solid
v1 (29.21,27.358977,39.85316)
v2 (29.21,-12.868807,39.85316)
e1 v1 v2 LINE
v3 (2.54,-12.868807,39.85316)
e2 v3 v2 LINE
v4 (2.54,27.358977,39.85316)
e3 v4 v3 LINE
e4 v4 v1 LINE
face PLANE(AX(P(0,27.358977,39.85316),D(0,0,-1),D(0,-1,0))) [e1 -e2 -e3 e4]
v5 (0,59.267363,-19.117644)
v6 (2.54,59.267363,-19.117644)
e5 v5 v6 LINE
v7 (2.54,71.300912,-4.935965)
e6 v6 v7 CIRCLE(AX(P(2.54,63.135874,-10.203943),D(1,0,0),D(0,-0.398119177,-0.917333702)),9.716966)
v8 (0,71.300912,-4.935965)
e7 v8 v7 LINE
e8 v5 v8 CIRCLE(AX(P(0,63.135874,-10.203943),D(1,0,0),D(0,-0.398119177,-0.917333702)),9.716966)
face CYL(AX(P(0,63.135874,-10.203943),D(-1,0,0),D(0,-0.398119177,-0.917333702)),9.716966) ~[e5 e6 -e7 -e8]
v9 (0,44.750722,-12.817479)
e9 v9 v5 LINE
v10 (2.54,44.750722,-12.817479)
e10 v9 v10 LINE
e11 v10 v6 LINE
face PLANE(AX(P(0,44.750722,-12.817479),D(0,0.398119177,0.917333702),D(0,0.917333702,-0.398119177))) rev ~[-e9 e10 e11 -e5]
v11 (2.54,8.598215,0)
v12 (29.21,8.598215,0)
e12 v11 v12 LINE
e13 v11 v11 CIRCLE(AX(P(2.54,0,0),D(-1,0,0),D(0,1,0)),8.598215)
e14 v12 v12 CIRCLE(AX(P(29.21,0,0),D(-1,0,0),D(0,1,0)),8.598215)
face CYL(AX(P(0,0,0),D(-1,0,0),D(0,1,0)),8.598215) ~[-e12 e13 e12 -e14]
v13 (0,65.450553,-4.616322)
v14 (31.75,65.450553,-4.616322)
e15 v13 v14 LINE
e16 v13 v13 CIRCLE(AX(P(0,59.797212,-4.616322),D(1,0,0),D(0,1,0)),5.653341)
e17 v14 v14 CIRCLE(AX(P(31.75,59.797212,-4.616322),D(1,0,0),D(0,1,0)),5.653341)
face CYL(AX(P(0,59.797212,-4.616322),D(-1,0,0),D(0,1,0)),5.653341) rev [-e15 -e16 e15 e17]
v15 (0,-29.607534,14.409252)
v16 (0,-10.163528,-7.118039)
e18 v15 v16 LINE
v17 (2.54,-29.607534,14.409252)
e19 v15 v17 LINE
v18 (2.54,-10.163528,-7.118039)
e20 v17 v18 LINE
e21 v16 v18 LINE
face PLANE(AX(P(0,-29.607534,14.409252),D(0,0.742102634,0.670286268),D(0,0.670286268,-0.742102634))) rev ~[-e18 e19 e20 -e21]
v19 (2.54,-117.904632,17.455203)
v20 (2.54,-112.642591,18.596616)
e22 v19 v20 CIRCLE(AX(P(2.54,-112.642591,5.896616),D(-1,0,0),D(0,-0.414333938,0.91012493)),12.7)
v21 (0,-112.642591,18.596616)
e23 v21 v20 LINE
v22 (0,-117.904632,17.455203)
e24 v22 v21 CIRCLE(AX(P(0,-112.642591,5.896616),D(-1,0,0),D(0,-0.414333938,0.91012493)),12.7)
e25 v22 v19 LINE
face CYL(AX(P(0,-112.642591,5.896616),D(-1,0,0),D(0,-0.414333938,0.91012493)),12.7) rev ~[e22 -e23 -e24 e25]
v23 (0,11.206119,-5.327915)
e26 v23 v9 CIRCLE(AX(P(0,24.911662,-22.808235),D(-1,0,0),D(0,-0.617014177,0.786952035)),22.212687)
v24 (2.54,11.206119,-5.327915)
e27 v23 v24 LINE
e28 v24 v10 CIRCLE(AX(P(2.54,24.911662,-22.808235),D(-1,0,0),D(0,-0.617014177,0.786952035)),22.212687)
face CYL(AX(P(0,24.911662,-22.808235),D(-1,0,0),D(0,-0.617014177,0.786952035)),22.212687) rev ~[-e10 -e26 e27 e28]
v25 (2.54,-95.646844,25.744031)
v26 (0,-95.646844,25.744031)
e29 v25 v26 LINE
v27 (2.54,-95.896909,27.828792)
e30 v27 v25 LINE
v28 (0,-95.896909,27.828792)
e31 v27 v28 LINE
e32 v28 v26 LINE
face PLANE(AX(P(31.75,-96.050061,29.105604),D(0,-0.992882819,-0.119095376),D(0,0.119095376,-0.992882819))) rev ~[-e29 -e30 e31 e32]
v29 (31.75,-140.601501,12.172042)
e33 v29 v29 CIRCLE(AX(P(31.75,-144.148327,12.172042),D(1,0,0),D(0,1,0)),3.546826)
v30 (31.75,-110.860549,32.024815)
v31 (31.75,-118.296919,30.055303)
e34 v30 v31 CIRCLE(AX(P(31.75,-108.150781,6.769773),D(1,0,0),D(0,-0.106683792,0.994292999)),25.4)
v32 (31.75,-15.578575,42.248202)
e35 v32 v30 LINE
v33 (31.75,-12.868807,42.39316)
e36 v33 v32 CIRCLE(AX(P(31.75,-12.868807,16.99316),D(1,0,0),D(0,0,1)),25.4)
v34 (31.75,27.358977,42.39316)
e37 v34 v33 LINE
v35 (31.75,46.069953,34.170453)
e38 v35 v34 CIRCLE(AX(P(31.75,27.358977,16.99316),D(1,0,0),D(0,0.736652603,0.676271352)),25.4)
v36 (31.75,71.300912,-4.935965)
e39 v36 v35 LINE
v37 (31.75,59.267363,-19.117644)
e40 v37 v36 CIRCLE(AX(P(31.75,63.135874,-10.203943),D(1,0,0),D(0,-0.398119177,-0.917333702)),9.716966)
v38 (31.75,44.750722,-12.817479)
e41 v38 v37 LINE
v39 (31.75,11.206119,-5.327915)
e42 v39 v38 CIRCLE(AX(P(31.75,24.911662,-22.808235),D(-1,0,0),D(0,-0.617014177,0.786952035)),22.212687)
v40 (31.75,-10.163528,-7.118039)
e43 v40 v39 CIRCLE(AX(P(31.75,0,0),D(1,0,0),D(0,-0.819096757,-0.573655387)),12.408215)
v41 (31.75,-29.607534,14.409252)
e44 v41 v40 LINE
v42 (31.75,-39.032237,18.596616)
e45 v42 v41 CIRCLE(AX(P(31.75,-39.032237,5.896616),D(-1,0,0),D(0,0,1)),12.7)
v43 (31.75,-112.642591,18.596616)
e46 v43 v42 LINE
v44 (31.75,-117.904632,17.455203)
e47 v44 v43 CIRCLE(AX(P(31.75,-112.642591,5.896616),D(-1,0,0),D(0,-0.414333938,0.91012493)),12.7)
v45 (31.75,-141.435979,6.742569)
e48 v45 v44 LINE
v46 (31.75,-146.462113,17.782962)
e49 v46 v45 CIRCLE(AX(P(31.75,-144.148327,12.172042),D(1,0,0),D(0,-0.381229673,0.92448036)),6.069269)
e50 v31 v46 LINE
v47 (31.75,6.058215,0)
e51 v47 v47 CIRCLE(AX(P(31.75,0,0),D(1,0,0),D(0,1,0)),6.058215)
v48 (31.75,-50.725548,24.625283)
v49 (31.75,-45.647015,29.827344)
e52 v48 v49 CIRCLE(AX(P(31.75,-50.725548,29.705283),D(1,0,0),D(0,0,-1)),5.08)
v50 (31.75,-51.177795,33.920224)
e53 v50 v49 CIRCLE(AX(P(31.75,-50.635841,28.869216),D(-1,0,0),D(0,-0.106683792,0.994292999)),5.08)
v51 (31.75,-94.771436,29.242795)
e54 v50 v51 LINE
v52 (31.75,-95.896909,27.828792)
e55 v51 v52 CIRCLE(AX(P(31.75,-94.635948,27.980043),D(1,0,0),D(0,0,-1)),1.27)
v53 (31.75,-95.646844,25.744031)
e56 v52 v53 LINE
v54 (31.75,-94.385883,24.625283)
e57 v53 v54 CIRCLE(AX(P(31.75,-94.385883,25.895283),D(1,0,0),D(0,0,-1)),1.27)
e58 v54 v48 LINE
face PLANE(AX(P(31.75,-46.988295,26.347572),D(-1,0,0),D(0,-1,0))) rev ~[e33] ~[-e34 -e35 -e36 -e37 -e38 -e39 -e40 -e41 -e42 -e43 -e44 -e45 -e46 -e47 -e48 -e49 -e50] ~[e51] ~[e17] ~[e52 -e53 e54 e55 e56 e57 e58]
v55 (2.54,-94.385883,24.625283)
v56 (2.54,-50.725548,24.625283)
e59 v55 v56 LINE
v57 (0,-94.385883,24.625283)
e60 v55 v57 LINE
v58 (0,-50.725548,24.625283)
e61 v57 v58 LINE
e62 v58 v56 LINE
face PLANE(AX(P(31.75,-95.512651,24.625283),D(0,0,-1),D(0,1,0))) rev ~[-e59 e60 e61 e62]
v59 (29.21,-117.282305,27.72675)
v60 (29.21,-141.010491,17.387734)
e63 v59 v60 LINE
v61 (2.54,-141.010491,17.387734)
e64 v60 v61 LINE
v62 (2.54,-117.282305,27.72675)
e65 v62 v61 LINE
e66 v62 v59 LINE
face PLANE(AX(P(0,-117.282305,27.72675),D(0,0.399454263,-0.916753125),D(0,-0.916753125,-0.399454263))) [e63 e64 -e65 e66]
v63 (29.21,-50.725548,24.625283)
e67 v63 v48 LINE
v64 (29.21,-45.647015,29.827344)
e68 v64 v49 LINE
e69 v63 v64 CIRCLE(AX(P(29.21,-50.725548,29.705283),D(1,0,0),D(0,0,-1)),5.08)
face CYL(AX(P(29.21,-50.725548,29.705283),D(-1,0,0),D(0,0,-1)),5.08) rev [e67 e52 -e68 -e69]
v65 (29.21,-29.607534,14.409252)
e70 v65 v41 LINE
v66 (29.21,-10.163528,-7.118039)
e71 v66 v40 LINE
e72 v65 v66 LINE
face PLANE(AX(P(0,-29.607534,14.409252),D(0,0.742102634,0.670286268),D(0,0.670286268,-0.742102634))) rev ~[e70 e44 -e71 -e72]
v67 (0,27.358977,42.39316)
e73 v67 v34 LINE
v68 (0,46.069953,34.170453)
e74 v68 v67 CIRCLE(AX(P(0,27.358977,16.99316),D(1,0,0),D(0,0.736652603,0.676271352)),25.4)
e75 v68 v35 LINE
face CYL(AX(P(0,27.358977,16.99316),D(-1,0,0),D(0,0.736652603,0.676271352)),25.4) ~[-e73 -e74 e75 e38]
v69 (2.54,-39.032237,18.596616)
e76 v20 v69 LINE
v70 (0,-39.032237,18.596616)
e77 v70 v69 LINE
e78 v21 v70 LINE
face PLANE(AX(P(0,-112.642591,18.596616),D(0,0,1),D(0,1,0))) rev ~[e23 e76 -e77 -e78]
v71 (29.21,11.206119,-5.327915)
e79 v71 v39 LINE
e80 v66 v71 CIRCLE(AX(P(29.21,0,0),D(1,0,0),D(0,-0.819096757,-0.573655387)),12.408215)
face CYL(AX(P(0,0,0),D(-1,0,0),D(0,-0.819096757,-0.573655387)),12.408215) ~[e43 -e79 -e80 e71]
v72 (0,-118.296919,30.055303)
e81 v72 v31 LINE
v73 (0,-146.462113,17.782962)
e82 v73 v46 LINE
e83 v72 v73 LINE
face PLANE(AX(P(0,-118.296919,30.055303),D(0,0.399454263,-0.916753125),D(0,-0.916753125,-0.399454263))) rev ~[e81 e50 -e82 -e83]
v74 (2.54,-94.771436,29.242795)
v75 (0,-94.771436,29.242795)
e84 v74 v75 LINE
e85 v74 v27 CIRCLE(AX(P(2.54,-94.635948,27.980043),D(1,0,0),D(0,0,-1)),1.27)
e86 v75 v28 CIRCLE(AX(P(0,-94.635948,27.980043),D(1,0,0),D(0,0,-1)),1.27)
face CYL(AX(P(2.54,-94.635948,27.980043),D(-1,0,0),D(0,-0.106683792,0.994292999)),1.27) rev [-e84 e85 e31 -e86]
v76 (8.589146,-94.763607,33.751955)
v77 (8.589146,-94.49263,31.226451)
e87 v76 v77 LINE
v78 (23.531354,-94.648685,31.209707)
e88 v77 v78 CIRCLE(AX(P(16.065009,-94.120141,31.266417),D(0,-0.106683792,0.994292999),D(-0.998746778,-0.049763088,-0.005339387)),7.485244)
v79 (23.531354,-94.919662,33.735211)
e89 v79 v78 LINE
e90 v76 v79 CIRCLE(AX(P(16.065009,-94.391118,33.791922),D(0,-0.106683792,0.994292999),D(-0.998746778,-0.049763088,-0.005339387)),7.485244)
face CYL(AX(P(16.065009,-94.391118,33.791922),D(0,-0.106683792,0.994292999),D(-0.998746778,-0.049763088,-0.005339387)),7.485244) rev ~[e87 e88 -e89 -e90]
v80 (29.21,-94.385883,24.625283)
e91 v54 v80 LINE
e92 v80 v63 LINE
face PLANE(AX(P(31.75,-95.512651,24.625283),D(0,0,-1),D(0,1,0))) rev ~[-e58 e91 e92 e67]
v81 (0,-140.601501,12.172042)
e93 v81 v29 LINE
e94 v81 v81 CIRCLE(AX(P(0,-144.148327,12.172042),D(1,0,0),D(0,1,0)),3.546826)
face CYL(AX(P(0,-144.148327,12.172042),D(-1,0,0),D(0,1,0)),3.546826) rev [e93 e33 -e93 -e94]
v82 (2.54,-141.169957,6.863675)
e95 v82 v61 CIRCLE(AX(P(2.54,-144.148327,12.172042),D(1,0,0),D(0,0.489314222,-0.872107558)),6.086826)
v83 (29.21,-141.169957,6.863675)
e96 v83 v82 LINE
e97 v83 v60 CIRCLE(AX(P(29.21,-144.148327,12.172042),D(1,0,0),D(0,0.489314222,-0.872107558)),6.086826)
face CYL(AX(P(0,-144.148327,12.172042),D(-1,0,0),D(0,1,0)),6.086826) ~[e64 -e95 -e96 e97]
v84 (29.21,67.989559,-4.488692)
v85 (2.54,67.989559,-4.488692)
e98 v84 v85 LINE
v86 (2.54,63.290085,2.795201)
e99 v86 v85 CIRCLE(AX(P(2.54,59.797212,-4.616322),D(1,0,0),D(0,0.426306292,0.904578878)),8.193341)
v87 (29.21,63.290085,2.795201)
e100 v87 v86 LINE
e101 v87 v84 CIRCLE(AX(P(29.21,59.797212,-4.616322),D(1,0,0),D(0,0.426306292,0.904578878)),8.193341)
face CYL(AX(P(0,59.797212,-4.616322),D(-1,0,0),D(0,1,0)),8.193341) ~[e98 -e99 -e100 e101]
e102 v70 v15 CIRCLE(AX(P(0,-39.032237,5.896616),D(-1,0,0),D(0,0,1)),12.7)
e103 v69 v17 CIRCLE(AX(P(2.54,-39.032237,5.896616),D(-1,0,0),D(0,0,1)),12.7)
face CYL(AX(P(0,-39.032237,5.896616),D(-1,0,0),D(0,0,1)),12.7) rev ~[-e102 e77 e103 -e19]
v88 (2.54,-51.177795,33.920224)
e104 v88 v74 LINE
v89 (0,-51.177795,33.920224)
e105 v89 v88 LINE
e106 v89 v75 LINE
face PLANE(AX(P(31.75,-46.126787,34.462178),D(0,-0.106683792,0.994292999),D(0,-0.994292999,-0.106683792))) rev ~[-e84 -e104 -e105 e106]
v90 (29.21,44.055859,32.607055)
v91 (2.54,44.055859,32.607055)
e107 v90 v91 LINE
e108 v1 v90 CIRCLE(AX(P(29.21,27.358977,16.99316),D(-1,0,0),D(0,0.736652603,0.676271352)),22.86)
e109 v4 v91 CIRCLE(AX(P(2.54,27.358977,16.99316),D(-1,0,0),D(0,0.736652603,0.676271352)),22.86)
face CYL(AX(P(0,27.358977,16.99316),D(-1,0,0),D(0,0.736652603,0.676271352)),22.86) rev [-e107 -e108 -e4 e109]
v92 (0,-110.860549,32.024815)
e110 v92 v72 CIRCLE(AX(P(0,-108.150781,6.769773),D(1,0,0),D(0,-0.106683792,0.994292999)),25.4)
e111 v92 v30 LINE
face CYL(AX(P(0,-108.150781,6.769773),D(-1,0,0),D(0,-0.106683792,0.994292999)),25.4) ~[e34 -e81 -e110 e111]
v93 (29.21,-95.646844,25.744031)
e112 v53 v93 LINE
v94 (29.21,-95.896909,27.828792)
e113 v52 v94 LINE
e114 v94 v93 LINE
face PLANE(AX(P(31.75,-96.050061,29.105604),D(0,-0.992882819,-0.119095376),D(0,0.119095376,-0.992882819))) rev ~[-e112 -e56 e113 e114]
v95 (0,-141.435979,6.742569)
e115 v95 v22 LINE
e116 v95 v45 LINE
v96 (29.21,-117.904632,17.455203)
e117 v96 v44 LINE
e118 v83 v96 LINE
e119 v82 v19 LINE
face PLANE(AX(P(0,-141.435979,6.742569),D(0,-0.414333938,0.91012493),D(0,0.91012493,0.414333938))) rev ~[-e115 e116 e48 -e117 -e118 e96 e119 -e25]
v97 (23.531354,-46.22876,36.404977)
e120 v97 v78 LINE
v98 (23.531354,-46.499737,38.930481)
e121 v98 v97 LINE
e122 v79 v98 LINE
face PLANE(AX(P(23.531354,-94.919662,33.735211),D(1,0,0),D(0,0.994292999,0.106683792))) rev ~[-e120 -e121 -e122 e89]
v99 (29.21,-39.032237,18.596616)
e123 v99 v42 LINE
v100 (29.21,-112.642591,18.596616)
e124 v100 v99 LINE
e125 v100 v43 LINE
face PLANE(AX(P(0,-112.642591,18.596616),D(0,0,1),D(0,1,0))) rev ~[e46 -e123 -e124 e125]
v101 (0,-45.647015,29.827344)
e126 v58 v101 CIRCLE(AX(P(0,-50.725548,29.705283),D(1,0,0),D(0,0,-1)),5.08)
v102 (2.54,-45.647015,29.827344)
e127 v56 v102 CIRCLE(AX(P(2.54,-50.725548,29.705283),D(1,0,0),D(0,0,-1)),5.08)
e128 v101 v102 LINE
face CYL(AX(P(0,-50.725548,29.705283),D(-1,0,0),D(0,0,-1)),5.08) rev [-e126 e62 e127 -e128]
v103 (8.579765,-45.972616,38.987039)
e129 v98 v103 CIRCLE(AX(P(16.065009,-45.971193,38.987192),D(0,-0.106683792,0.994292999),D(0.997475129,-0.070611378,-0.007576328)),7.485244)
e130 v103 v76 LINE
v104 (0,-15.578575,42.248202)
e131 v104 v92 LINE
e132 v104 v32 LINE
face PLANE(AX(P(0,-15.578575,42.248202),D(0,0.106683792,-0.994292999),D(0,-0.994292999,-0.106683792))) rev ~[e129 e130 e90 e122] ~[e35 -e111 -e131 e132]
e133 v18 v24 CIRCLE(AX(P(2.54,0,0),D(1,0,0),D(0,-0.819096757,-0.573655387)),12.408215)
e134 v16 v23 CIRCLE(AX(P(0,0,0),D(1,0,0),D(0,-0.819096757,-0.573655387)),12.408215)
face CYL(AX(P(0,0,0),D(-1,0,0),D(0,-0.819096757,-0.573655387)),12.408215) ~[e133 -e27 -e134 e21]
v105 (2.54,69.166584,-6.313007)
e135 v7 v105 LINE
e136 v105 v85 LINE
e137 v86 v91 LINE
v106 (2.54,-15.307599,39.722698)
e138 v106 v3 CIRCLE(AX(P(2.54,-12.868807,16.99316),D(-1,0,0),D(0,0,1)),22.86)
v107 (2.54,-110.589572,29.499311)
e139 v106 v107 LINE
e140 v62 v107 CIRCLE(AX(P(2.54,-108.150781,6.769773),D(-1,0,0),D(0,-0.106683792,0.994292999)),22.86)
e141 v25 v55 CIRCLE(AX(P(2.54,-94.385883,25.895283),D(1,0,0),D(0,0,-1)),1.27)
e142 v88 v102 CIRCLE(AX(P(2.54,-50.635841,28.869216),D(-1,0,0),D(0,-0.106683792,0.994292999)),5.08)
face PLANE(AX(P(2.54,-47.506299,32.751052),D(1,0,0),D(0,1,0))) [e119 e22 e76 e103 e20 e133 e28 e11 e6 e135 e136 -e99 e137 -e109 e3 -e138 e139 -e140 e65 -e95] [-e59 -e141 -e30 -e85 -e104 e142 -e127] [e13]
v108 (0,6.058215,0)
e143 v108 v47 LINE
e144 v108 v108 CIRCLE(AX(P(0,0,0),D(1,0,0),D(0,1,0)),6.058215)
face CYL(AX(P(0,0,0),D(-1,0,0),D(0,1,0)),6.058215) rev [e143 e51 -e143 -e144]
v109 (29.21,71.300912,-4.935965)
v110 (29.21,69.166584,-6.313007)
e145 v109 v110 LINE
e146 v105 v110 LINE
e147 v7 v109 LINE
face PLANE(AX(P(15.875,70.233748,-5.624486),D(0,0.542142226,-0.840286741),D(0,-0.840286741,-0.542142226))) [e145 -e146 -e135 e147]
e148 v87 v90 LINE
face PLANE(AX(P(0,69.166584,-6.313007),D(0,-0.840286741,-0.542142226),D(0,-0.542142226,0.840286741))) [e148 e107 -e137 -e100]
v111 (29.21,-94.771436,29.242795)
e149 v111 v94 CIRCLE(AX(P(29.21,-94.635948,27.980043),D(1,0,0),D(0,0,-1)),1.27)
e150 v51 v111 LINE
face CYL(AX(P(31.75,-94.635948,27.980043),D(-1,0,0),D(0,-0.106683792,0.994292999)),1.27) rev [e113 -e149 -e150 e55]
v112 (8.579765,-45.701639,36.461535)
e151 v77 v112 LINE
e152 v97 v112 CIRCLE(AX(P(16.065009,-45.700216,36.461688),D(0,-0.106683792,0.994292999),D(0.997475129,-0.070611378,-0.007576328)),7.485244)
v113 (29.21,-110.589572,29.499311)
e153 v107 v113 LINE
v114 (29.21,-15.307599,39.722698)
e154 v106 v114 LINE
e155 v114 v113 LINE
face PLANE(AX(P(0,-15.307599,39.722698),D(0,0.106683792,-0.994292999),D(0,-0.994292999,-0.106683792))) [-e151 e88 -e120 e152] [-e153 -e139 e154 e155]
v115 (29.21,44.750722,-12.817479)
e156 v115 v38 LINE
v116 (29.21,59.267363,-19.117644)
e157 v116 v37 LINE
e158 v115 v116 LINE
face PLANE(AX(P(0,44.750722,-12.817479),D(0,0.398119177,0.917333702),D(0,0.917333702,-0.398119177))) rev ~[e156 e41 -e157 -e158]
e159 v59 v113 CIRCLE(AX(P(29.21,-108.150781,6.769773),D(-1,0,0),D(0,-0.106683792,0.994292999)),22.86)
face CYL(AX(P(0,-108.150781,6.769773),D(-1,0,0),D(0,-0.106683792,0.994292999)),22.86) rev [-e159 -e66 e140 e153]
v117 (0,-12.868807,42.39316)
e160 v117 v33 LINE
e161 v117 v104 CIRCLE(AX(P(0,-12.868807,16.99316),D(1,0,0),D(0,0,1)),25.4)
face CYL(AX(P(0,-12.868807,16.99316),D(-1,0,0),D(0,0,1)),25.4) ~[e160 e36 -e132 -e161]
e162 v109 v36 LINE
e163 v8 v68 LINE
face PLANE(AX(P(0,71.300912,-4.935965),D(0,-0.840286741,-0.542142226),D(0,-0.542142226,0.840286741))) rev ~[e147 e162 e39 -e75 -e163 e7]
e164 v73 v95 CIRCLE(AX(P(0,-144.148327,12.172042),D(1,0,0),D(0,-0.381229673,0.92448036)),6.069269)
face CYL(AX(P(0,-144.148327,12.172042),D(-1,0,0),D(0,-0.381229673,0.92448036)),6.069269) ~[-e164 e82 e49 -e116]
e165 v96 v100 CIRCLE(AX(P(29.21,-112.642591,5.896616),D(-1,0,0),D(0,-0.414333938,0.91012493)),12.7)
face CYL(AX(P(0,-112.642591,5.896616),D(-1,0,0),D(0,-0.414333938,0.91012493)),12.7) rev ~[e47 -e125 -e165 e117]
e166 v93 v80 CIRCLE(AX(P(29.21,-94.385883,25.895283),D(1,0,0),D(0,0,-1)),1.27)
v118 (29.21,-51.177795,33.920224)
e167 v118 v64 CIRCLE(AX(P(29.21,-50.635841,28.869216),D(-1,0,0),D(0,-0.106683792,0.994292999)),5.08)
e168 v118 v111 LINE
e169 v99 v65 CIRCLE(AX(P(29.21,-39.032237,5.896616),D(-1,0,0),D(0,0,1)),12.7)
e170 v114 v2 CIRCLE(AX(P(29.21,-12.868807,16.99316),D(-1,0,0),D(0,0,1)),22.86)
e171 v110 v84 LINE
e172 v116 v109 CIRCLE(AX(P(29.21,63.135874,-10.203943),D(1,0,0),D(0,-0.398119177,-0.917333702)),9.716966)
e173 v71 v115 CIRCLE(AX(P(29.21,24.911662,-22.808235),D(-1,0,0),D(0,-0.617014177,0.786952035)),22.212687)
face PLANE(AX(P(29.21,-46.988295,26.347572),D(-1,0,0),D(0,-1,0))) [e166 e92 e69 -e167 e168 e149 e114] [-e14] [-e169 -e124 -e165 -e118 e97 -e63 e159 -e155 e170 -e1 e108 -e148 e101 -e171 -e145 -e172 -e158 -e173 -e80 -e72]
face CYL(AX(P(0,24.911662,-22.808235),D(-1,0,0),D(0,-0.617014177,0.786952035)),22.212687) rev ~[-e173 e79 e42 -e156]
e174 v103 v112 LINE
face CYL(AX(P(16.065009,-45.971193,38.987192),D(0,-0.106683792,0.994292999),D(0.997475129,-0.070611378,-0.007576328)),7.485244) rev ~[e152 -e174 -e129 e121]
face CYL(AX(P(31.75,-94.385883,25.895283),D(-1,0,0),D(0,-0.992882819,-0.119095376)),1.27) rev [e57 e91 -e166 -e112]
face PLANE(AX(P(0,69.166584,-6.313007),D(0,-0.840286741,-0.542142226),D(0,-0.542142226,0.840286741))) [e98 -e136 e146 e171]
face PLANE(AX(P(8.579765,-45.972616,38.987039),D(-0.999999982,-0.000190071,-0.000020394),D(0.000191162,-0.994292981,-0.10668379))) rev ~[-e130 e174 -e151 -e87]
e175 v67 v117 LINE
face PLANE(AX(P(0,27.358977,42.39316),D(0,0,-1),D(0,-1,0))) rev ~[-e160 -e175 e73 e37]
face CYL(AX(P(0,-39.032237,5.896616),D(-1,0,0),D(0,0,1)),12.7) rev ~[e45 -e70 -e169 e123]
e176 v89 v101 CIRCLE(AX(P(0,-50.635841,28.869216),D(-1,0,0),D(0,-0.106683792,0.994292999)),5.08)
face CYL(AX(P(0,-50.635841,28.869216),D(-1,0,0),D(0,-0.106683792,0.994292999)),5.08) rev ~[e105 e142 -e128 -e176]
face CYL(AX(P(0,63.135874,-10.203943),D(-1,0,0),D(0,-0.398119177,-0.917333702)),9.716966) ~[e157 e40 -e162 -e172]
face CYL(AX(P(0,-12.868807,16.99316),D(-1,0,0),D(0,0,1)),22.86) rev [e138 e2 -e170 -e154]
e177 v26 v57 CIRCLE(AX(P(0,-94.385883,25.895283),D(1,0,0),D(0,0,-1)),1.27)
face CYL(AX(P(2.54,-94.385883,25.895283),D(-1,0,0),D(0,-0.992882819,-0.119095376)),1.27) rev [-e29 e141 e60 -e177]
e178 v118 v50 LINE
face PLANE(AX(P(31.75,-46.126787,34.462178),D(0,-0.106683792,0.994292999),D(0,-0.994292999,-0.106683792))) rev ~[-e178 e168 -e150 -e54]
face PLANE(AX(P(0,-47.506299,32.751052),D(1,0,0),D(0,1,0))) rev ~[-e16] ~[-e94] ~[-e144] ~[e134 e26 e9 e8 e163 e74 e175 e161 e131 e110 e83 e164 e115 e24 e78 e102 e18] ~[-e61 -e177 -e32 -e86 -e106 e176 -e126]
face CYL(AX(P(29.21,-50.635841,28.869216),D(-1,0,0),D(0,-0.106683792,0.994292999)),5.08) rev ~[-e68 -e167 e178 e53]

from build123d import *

# Parameters (mm, degrees)
F0_R        = 5.6533409101
F0_R_2      = 6.0582147302
F0_R_3      = 3.5468264326
F1_DEPTH    = 31.75
F2_T        = 2.54
F2_T3_DEPTH = 36.83
F4_DEPTH    = 25.4
F6_DEPTH    = 31.751
F7_T1_DEPTH = 2.54
F7_T3_DEPTH = 2.54
F8_R        = 1.27


# Not quite as in the source:
# - a fillet or chamfer that OpenCascade refuses, or shapes differently, is made with other operations: its cross-section is extruded or revolved along the edge and cut away or added
# - a shell that OpenCascade refuses in one call is made with other operations: the cavity is built on its own and cut out


with BuildPart() as f1:
    # F0 (on Right) → F1 (new body)
    with BuildSketch(Plane.YZ):
        with BuildLine():
            Line((-118.2969192854, 30.0553025028), (-146.4621126652, 17.7829619497))
            ThreePointArc((-146.4621126652, 17.7829619497), (-149.6721200055, 9.657338463), (-141.4359788777, 6.7425685756))
            Line((-141.4359788777, 6.7425685756), (-117.9046317908, 17.455203049))
            ThreePointArc((-117.9046317908, 17.455203049), (-115.3347971308, 18.3079832041), (-112.6425907814, 18.5966164392))
            Line((-112.6425907814, 18.5966164392), (-39.032237408, 18.5966164392))
            ThreePointArc((-39.032237408, 18.5966164392), (-33.875711062, 17.5026595222), (-29.6075339545, 14.4092520366))
            Line((-29.6075339545, 14.4092520366), (-10.1635284412, -7.1180392256))
            ThreePointArc((-10.1635284412, -7.1180392256), (1.0358015594, -12.3649063046), (11.2061193672, -5.3279153072))
            ThreePointArc((11.2061193672, -5.3279153072), (29.7519512617, -1.1293262164), (44.7507215315, -12.8174792531))
            Line((44.7507215315, -12.8174792531), (59.2673632914, -19.1176440206))
            ThreePointArc((59.2673632914, -19.1176440206), (70.5449926496, -16.490786447), (71.3009120761, -4.9359653548))
            Line((71.3009120761, -4.9359653548), (46.0699528524, 34.1704526075))
            ThreePointArc((46.0699528524, 34.1704526075), (37.5779975797, 40.2467968073), (27.3589767296, 42.3931602559))
            Line((27.3589767296, 42.3931602559), (-12.8688071267, 42.3931602559))
            ThreePointArc((-12.8688071267, 42.3931602559), (-14.2256285087, 42.3568949126), (-15.5785754345, 42.2482024399))
            Line((-15.5785754345, 42.2482024399), (-110.8605493232, 32.0248153133))
            ThreePointArc((-110.8605493232, 32.0248153133), (-114.6537287056, 31.3232183323), (-118.2969192854, 30.0553025028))
        make_face()
        with Locations((59.7972124815, -4.6163224615)):
            Circle(F0_R, mode=Mode.SUBTRACT)
        Circle(F0_R_2, mode=Mode.SUBTRACT)
        with Locations((-144.1483274102, 12.1720423922)):
            Circle(F0_R_3, mode=Mode.SUBTRACT)
    extrude(amount=F1_DEPTH)

    # F2: shell of thickness 2.54, made by hand


with BuildPart() as f2_core1:
    # F2_t2: copy of F1
    add(f1.part)

    # the walls: a layer under each face that stays
    f2_faces = [f2_core1.faces().sort_by_distance(p)[0] for p in [
        (15.875, -63.2195623789, 37.1365088766),
        (15.875, -114.6537287056, 31.3232183323),
        (15.875, -132.3795159753, 23.9191322262),
        (15.875, -149.6721200055, 9.657338463),
        (15.875, 58.6854324642, 14.6172436263),
        (15.875, 37.5779975797, 40.2467968073),
        (15.875, 7.2450848014, 42.3931602559),
        (15.875, -14.2256285087, 42.3568949126),
        (15.875, 54.1438715714, -4.6163224615),
        (15.875, -6.0582147302, 0),
        (15.875, -147.6951538428, 12.1720423922),
        (0, -38.6823777389, 32.0074819355),
        (31.75, -38.6823777389, 32.0074819355),
    ]]
    thicken(f2_faces, amount=-F2_T, mode=Mode.SUBTRACT)

    # F2_s4 → F2_t3 (cut)
    with BuildSketch(Plane.YZ.offset(-2.54)):
        Polygon((-146.4819420371, 17.8297292802), (-145.4474988382, 15.4544090123), (-145.4705469322, 15.4443663311), (-145.4937892966, 15.4347818344), align=None)
    extrude(amount=F2_T3_DEPTH, mode=Mode.SUBTRACT)


with BuildPart() as f1_1:
    add(f1.part)

    # what is left inside the walls is the cavity
    f2_cavity = [f2_core1.part.solids().sort_by_distance(p)[0] for p in [
        (29.1846, -87.664257, 19.92847),
    ]]
    add(f2_cavity, mode=Mode.SUBTRACT)

    # F3 (on face) → F4 (cut)
    with BuildSketch(Plane(origin=(0, -4.6587823298, 43.4198539884), x_dir=(1, 0, 0), z_dir=(0, -0.1066837916, 0.9942929994))):
        with BuildLine():
            Line((8.5797651154, -41.550964987), (8.5891456531, -90.6220046018))
            ThreePointArc((8.5891456531, -90.6220046018), (15.9863896259, -97.7322088228), (23.5313536211, -90.7789548531))
            Line((23.5313536211, -90.7789548531), (23.5313536211, -42.0811111897))
            ThreePointArc((23.5313536211, -42.0811111897), (16.3302504196, -34.0689910553), (8.5797651154, -41.550964987))
        make_face()
    extrude(amount=-F4_DEPTH, mode=Mode.SUBTRACT)

    # F5 (on face) → F6 (cut, through all)
    with BuildSketch(Plane.YZ.offset(31.75)):
        Polygon((-46.1267865209, 34.4621779106), (-96.0500612855, 29.1056036949), (-95.512650907, 24.6252825343), (-45.0713257087, 24.6252825343), align=None)
    extrude(amount=-F6_DEPTH, mode=Mode.SUBTRACT)

    # F7: fillet of radius 5.08 on 4 edges, made by hand

    # F7_s2 → F7_t1 (join)
    with BuildSketch(Plane.YZ.offset(29.21)):
        with BuildLine():
            ThreePointArc((-50.7255480205, 24.6252825343), (-46.9466907461, 26.3101922999), (-45.6745395837, 30.2472361958))
            Line((-45.6745395837, 30.2472361958), (-45.0713257087, 24.6252825343))
            Line((-45.0713257087, 24.6252825343), (-50.7255480205, 24.6252825343))
        make_face()
        with BuildLine():
            ThreePointArc((-51.1777949577, 33.920224249), (-47.4474580879, 32.8240372389), (-45.5848328594, 29.4111694737))
            Line((-45.5848328594, 29.4111694737), (-46.1267865209, 34.4621779106))
            Line((-46.1267865209, 34.4621779106), (-51.1777949577, 33.920224249))
        make_face()
    extrude(amount=F7_T1_DEPTH)

    # F7_s4 → F7_t3 (join)
    with BuildSketch(Plane.YZ):
        with BuildLine():
            ThreePointArc((-51.1777949577, 33.920224249), (-47.4474580879, 32.8240372389), (-45.5848328594, 29.4111694737))
            Line((-45.5848328594, 29.4111694737), (-46.1267865209, 34.4621779106))
            Line((-46.1267865209, 34.4621779106), (-51.1777949577, 33.920224249))
        make_face()
        with BuildLine():
            ThreePointArc((-50.7255480205, 24.6252825343), (-46.9466907461, 26.3101922999), (-45.6745395837, 30.2472361958))
            Line((-45.6745395837, 30.2472361958), (-45.0713257087, 24.6252825343))
            Line((-45.0713257087, 24.6252825343), (-50.7255480205, 24.6252825343))
        make_face()
    extrude(amount=F7_T3_DEPTH)

    # F8
    f8_edges = [f1_1.edges().sort_by_distance(p)[0] for p in [
        (30.48, -96.050061, 29.105604),
        (30.48, -95.512651, 24.625283),
        (1.27, -96.050061, 29.105604),
        (1.27, -95.512651, 24.625283),
    ]]
    fillet(f8_edges, radius=F8_R)


solid = f1_1.part
